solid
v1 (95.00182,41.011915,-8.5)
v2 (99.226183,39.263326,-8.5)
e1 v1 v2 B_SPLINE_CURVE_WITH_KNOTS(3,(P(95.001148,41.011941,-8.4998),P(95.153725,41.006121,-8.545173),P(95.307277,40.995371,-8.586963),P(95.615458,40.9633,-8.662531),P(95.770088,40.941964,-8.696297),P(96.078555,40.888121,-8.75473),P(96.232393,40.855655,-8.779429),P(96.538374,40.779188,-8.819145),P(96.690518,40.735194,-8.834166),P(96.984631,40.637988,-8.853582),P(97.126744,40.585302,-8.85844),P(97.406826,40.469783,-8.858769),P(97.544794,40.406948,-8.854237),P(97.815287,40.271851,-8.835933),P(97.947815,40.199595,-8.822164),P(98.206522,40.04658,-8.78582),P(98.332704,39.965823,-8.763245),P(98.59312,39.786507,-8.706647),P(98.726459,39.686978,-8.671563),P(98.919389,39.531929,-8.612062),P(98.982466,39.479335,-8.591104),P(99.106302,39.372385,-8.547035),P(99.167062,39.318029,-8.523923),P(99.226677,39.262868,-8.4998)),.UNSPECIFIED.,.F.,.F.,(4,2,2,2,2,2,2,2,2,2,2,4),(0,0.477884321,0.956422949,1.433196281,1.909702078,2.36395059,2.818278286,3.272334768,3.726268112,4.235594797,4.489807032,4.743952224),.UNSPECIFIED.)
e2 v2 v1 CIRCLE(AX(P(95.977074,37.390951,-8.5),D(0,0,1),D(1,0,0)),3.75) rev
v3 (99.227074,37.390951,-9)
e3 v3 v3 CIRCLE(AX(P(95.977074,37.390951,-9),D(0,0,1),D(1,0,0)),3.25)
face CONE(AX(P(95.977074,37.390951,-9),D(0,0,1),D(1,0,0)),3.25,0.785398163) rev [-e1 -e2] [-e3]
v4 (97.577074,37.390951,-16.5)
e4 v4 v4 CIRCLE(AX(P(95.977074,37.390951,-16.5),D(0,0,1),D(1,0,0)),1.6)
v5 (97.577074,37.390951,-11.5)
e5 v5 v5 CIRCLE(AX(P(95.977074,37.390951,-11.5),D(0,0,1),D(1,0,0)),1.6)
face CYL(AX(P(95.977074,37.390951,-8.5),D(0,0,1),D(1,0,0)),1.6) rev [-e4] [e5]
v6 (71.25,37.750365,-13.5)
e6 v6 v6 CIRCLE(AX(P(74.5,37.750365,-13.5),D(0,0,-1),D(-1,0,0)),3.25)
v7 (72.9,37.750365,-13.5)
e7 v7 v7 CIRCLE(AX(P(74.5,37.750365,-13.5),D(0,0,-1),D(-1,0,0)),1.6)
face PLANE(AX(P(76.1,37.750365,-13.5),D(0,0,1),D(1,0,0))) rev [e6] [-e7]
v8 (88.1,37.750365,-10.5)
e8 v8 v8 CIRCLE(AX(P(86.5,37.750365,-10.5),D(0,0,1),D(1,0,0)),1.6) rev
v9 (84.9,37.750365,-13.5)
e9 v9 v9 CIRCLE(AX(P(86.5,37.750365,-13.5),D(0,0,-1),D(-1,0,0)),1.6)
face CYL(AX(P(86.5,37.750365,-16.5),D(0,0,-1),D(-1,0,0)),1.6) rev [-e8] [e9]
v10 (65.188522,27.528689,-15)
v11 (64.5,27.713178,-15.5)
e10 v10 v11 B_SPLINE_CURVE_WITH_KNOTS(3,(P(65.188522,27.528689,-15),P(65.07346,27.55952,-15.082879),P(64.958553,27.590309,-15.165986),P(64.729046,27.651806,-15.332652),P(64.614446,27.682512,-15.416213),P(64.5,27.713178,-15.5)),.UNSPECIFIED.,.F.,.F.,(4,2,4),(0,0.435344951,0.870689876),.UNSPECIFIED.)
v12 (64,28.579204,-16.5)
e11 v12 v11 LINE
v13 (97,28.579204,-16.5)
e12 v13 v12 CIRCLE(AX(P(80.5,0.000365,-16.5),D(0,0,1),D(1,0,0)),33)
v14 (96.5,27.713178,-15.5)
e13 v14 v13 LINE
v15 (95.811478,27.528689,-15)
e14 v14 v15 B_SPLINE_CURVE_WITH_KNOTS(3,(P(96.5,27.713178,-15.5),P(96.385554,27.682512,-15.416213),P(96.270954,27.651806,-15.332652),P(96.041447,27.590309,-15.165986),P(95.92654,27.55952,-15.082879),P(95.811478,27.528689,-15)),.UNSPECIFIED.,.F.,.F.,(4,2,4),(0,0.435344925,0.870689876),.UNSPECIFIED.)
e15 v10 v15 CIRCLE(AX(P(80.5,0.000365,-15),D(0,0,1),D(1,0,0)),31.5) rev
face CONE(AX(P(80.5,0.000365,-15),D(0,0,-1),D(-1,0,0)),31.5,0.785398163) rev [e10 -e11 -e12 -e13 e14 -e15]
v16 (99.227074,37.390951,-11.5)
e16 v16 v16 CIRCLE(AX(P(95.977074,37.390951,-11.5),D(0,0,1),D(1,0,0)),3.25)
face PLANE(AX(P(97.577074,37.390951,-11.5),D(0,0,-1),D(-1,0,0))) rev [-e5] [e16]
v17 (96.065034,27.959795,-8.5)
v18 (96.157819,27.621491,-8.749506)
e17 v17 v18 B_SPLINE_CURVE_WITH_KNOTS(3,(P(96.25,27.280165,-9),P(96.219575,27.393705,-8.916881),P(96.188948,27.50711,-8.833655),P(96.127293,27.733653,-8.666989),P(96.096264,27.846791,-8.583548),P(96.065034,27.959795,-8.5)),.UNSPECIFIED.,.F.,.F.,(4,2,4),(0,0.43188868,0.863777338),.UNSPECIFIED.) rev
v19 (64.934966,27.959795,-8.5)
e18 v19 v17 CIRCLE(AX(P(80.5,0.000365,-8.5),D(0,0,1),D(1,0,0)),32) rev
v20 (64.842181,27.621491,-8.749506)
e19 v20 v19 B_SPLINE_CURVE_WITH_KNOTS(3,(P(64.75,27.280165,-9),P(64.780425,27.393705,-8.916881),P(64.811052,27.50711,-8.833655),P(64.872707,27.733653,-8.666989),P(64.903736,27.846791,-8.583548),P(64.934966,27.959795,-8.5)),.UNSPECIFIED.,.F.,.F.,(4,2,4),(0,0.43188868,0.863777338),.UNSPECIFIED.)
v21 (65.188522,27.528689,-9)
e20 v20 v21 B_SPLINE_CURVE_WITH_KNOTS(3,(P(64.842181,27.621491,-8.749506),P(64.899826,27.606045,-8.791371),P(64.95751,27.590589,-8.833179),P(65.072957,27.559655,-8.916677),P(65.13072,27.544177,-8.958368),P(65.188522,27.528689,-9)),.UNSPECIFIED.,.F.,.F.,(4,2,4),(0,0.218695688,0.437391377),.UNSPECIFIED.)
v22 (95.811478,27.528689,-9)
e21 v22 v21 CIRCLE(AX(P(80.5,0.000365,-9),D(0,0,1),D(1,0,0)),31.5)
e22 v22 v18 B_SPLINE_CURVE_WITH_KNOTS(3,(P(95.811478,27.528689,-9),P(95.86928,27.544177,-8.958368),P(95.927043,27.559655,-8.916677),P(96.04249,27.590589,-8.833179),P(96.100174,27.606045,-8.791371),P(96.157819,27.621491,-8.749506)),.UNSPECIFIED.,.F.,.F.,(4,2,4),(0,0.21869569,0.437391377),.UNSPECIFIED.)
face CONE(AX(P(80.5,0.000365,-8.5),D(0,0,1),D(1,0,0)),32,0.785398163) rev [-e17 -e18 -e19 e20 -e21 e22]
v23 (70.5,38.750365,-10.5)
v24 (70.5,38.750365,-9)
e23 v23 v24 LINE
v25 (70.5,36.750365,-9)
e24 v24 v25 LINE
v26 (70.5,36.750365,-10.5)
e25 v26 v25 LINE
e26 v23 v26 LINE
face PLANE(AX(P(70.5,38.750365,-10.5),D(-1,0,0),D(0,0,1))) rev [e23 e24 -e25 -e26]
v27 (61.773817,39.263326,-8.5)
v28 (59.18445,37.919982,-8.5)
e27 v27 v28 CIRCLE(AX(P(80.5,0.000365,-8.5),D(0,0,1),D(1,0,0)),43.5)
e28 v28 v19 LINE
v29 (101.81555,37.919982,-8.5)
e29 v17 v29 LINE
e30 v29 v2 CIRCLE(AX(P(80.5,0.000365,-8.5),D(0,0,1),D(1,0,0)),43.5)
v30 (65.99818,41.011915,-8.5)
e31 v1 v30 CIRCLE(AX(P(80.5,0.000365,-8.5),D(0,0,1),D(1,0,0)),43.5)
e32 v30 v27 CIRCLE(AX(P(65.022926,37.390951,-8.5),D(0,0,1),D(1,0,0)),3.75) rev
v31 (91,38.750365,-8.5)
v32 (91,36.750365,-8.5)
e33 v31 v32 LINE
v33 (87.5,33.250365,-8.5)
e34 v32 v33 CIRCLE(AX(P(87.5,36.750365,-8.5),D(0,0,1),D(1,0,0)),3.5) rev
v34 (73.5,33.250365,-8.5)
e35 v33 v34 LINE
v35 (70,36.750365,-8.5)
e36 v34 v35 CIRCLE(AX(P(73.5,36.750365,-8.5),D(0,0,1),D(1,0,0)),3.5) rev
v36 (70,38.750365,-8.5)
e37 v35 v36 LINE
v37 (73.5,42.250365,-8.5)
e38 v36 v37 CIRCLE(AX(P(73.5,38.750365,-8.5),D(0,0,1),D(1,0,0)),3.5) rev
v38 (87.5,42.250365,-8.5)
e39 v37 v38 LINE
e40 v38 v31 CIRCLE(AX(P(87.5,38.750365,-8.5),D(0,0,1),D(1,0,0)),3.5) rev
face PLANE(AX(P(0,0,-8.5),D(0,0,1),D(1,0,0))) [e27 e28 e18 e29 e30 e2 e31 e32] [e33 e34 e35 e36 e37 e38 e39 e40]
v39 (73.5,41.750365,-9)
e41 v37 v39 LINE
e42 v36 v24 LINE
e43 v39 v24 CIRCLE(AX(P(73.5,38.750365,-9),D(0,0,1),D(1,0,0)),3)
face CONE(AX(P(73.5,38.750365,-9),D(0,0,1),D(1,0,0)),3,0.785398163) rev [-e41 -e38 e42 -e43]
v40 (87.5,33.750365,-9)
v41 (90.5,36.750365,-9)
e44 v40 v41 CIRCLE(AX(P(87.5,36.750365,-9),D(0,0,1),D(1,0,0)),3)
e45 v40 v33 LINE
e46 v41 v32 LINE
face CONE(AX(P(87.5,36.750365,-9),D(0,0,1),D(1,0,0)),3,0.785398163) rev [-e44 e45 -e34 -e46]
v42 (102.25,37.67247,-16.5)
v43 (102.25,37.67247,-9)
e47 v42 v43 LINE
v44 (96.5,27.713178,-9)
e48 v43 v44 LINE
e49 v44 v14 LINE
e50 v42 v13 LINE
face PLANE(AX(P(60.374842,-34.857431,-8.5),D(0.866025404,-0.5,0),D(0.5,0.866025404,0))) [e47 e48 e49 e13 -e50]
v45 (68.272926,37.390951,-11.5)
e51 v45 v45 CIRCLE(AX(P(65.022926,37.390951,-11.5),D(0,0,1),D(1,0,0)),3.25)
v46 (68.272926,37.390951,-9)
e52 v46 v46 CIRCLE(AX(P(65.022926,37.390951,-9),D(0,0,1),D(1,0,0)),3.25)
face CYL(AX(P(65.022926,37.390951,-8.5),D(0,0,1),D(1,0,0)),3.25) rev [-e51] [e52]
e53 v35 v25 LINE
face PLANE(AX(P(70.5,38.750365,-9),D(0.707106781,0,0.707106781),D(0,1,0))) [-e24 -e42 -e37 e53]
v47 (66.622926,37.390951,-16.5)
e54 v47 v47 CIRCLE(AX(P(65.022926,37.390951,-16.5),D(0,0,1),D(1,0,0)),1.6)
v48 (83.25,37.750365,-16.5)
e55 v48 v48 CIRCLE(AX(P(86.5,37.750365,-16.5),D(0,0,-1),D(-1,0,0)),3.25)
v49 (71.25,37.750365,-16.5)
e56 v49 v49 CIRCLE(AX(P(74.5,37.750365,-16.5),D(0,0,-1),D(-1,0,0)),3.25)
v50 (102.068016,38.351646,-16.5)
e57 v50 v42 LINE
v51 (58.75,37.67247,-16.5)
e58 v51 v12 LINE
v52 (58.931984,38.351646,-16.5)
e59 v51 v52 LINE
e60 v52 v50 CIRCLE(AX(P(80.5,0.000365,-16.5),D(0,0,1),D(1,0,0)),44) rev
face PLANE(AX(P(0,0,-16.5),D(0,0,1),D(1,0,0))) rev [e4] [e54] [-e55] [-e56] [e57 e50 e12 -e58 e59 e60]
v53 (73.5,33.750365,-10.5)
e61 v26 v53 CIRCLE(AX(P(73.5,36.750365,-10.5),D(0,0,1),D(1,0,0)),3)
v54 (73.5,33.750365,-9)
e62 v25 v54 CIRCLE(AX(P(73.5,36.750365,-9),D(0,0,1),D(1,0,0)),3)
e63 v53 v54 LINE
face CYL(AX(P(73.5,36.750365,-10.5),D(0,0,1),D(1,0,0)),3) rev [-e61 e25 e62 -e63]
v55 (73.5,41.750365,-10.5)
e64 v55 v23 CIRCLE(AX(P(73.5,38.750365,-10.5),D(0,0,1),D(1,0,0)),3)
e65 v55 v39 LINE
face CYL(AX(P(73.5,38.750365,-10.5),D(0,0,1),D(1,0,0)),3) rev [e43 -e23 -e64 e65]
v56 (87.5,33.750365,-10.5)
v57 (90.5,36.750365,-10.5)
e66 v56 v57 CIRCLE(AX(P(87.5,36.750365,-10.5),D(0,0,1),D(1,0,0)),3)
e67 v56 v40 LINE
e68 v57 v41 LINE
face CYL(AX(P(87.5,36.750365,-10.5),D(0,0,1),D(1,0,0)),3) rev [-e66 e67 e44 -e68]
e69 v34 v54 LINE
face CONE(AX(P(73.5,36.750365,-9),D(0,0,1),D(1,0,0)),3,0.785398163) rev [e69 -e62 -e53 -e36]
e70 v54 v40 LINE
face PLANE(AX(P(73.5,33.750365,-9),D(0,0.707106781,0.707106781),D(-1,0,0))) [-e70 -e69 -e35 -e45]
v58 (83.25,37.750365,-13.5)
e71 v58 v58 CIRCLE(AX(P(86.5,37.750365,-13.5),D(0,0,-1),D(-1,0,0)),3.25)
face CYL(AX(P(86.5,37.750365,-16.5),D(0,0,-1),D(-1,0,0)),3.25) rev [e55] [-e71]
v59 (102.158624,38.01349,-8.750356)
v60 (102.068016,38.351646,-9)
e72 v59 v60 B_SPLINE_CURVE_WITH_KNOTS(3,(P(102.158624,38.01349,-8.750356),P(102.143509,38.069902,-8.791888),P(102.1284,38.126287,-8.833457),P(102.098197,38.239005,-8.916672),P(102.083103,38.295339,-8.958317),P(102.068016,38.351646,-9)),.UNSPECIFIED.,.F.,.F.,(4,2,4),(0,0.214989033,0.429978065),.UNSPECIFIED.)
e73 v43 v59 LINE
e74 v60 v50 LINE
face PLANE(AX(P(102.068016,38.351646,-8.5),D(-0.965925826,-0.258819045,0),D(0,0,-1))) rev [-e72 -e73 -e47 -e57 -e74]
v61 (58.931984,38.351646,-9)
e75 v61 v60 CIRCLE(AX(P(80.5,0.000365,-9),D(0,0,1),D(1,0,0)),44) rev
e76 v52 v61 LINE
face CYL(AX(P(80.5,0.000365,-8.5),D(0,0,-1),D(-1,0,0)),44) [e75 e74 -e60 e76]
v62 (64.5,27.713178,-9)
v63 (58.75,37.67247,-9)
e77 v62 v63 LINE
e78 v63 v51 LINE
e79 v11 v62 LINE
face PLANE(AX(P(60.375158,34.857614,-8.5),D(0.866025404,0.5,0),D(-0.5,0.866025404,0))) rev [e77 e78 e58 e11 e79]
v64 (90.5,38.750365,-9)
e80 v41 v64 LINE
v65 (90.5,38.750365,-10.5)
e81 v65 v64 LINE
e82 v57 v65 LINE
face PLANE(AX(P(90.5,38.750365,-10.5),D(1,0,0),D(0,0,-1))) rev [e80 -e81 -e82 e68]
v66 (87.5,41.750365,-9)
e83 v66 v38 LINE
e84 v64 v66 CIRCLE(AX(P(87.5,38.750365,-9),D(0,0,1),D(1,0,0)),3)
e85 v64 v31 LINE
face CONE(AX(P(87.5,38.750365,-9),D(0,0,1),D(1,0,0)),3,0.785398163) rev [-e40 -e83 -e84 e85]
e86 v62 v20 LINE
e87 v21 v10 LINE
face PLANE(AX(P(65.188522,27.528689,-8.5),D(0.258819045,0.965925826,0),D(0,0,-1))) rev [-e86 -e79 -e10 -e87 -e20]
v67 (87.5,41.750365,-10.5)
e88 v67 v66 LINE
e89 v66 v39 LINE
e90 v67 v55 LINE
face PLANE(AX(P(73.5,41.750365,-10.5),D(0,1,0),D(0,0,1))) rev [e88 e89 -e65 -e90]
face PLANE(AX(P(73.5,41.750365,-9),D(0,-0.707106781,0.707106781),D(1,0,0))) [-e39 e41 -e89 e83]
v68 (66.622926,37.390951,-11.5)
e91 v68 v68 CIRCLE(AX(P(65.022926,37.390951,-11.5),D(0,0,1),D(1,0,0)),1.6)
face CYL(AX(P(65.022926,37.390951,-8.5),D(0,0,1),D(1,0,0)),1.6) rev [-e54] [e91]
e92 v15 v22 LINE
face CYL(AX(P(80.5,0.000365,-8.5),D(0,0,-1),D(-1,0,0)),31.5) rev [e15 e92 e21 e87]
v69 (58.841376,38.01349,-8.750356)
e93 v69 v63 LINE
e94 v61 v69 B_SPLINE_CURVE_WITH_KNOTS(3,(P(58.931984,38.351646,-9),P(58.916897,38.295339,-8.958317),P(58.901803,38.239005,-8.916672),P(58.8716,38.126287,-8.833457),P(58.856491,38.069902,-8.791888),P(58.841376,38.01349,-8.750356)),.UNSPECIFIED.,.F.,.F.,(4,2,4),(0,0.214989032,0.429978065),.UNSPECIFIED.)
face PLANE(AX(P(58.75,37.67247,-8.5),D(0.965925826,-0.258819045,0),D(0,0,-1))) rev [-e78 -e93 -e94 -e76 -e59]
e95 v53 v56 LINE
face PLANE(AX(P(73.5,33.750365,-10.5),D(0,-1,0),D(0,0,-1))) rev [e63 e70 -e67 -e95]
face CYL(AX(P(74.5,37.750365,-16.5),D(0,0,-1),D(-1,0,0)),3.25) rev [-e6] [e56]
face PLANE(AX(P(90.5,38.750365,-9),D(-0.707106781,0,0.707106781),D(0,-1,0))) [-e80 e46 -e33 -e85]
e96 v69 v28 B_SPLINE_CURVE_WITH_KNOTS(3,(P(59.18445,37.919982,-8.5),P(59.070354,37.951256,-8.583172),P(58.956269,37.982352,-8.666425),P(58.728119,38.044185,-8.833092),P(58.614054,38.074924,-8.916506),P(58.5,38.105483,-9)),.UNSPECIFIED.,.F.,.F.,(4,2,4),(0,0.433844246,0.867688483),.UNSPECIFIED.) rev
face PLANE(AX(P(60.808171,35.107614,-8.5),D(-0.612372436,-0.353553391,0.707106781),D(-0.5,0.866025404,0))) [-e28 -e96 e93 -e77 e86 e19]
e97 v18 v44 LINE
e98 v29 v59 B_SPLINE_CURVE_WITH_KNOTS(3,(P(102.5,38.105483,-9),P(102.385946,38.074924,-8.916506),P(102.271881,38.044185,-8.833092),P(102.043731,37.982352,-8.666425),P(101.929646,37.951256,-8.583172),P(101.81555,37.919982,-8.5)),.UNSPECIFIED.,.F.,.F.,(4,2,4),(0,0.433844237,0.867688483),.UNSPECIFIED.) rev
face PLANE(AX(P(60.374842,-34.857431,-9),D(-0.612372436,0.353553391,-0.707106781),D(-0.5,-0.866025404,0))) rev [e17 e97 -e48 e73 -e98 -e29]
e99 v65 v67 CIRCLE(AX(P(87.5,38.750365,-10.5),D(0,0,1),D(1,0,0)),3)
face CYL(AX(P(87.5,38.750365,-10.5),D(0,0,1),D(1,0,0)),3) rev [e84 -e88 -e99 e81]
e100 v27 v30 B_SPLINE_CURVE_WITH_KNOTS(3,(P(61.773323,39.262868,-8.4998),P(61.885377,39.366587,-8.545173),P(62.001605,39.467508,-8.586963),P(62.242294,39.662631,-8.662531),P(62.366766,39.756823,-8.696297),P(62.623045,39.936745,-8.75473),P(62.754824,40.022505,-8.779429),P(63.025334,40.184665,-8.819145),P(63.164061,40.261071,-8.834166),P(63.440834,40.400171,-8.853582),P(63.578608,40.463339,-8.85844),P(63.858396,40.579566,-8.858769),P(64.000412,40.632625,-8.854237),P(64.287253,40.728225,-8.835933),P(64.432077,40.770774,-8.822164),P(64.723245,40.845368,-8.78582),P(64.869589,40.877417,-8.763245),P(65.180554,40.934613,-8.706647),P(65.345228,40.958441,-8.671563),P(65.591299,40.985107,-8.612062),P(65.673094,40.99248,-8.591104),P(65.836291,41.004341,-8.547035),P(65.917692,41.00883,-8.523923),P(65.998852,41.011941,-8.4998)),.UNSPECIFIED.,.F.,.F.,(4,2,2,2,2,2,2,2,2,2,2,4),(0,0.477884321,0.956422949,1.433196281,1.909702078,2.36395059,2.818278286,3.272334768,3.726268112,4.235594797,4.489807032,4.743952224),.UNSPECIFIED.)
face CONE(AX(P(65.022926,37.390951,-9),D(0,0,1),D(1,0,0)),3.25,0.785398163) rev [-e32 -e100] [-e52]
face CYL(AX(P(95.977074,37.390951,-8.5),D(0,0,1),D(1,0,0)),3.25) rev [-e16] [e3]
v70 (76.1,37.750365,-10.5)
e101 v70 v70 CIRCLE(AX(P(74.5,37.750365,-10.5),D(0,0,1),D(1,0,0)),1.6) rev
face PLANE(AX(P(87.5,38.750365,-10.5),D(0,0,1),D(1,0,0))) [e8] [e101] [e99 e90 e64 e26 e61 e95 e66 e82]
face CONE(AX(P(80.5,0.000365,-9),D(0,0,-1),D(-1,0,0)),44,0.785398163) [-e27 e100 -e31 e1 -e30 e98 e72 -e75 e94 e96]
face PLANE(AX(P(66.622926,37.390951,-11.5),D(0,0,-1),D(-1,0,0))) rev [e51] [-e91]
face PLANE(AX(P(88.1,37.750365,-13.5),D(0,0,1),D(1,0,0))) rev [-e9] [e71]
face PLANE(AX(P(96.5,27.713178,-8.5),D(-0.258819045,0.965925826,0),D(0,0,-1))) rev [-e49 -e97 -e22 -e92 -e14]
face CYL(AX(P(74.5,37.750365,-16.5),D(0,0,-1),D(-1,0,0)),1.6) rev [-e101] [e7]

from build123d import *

# Parameters (mm, degrees)
EXTRUDE_1_DEPTH              = 8
CHAMFER_7_SIZE               = 1.5
HOLE_WIZARD_M3_1_D           = 3.2
HOLE_WIZARD_M3_1_CBORE_D     = 6.5
HOLE_WIZARD_M3_1_CBORE_DEPTH = 3
HOLE_WIZARD_M3_2_D           = 3.2
HOLE_WIZARD_M3_2_CBORE_D     = 6.5
HOLE_WIZARD_M3_2_CBORE_DEPTH = 3
CUT_EXTRUDE_6_DEPTH          = 2
CHAMFER_8_SIZE               = 0.5
CHAMFER_9_SIZE               = 0.5


with BuildPart() as part:
    # ｽｹｯﾁ3 → ﾎﾞｽ - 押し出し1 (new body)
    with BuildSketch(Plane.XY.offset(-16.5)):
        with BuildLine():
            Line((58.49999999, 38.105482977), (64.74999999, 27.280165429))
            ThreePointArc((64.74999999, 27.280165429), (80.49999999, 31.50036521), (96.24999999, 27.280165429))
            Line((96.24999999, 27.280165429), (102.49999999, 38.105482977))
            ThreePointArc((102.49999999, 38.105482977), (80.49999999, 44.00036521), (58.49999999, 38.105482977))
        make_face()
    extrude(amount=EXTRUDE_1_DEPTH)

    # 面取り7
    chamfer_7_edges = [part.edges().sort_by_distance(p)[0] for p in [
        (80.49999999, 31.50036521, -16.5),
    ]]
    chamfer(chamfer_7_edges, length=CHAMFER_7_SIZE)

    # M3 穴付きねじ用座ぐり穴1 (through all)
    with Locations(Plane.XY.offset(-8.5)):
        with Locations((65.0229264, 37.390950693), (95.977073581, 37.390950693)):
            CounterBoreHole(HOLE_WIZARD_M3_1_D / 2, HOLE_WIZARD_M3_1_CBORE_D / 2, HOLE_WIZARD_M3_1_CBORE_DEPTH)

    # M3 穴付きねじ用座ぐり穴2 (through all)
    with Locations(Plane(origin=(0, 0, -16.5), x_dir=(-1, 0, 0), z_dir=(0, 0, -1))):
        with Locations((-86.49999999, 37.75036521), (-74.49999999, 37.75036521)):
            CounterBoreHole(HOLE_WIZARD_M3_2_D / 2, HOLE_WIZARD_M3_2_CBORE_D / 2, HOLE_WIZARD_M3_2_CBORE_DEPTH)

    # ｽｹｯﾁ17 → ｶｯﾄ - 押し出し6 (cut)
    with BuildSketch(Plane.XY.offset(-8.5)):
        with BuildLine():
            Line((73.49999999, 41.75036521), (87.49999999, 41.75036521))
            ThreePointArc((87.49999999, 41.75036521), (89.621320334, 40.871685554), (90.49999999, 38.75036521))
            Line((90.49999999, 38.75036521), (90.49999999, 36.75036521))
            ThreePointArc((90.49999999, 36.75036521), (89.621320334, 34.629044867), (87.49999999, 33.75036521))
            Line((87.49999999, 33.75036521), (73.49999999, 33.75036521))
            ThreePointArc((73.49999999, 33.75036521), (71.378679647, 34.629044867), (70.49999999, 36.75036521))
            Line((70.49999999, 36.75036521), (70.49999999, 38.75036521))
            ThreePointArc((70.49999999, 38.75036521), (71.378679647, 40.871685554), (73.49999999, 41.75036521))
        make_face()
    extrude(amount=-CUT_EXTRUDE_6_DEPTH, mode=Mode.SUBTRACT)

    # 面取り8
    # the kernel refuses this chamfer: 0.5 mm, written as the material it takes off along each edge
    with BuildSketch(Plane(origin=(80.49999999, 0.00036521, -8.5), x_dir=(-0.5349312949950591, 0.844895561377209, 0), z_dir=(-0.844895561377209, -0.5349312949950591, 0))) as chamfer_8_piece_1:
        Polygon((31.5, CHAMFER_8_SIZE), (31.5 + CHAMFER_8_SIZE, 0), (31.5, 0), align=None)
    revolve(axis=Axis((80.49999999, 0.00036521, -8.5), (0, 0, -1)), revolution_arc=64.678504259, mode=Mode.SUBTRACT)
    with BuildSketch(Plane(origin=(95.607079243, 26.16659403, -8.5), x_dir=(-0.8660254037844379, 0.5000000000000012, 0), z_dir=(0.5000000000000012, 0.866025403784438, 0))) as chamfer_8_piece_2:
        Polygon((CHAMFER_8_SIZE, 0), (0, -CHAMFER_8_SIZE), (0, 0), align=None)
    extrude(amount=15.071682988, mode=Mode.SUBTRACT)
    with BuildSketch(Plane(origin=(80.49999999, 0.00036521, -8.5), x_dir=(0.5250957878127545, 0.8510431326444641, 0), z_dir=(0.8510431326444641, -0.5250957878127545, 0))) as chamfer_8_piece_3:
        Polygon((44 - CHAMFER_8_SIZE, 0), (44, -CHAMFER_8_SIZE), (44, 0), align=None)
    revolve(axis=Axis((80.49999999, 0.00036521, -8.5), (0, 0, 1)), revolution_arc=63.349383731, mode=Mode.SUBTRACT)
    with BuildSketch(Plane(origin=(95.977073581, 37.390950693, -8.5), x_dir=(1, 0, 0), z_dir=(0, -1, 0))) as chamfer_8_piece_4:
        Polygon((3.25 + CHAMFER_8_SIZE, 0), (3.25, -CHAMFER_8_SIZE), (3.25, 0), align=None)
    revolve(axis=Axis((95.977073581, 37.390950693, -8.5), (0, 0, 1)), mode=Mode.SUBTRACT)
    with BuildSketch(Plane(origin=(65.0229264, 37.390950693, -8.5), x_dir=(1, 0, 0), z_dir=(0, -1, 0))) as chamfer_8_piece_5:
        Polygon((3.25 + CHAMFER_8_SIZE, 0), (3.25, -CHAMFER_8_SIZE), (3.25, 0), align=None)
    revolve(axis=Axis((65.0229264, 37.390950693, -8.5), (0, 0, 1)), mode=Mode.SUBTRACT)
    with BuildSketch(Plane(origin=(57.857079243, 39.219054376, -8.5), x_dir=(0, 0, -1), z_dir=(0.5000000000000007, -0.8660254037844384, 0))) as chamfer_8_piece_6:
        Polygon((CHAMFER_8_SIZE, 0), (0, CHAMFER_8_SIZE), (0, 0), align=None)
    extrude(amount=15.071682988, mode=Mode.SUBTRACT)
    with BuildSketch(Plane(origin=(87.49999999, 38.75036521, -8.5), x_dir=(0, 1, 0), z_dir=(-1, 0, 0))) as chamfer_8_piece_7:
        Polygon((3 + CHAMFER_8_SIZE, 0), (3, CHAMFER_8_SIZE), (3, 0), align=None)
    revolve(axis=Axis((87.49999999, 38.75036521, -8.5), (0, 0, -1)), revolution_arc=90, mode=Mode.SUBTRACT)
    with BuildSketch(Plane(origin=(73.49999999, 41.75036521, -8.5), x_dir=(0, 1, 0), z_dir=(1, 0, 0)), Plane(origin=(87.49999999, 33.75036521, -8.5), x_dir=(0, -1, 0), z_dir=(-1, 0, 0))) as chamfer_8_piece_8:
        Polygon((CHAMFER_8_SIZE, 0), (0, -CHAMFER_8_SIZE), (0, 0), align=None)
    extrude(amount=14, mode=Mode.SUBTRACT)
    with BuildSketch(Plane(origin=(73.49999999, 38.75036521, -8.5), x_dir=(-1, 0, 0), z_dir=(0, -1, 0))) as chamfer_8_piece_9:
        Polygon((3 + CHAMFER_8_SIZE, 0), (3, CHAMFER_8_SIZE), (3, 0), align=None)
    revolve(axis=Axis((73.49999999, 38.75036521, -8.5), (0, 0, -1)), revolution_arc=90, mode=Mode.SUBTRACT)
    with BuildSketch(Plane(origin=(70.49999999, 36.75036521, -8.5), x_dir=(-1, 0, 0), z_dir=(0, 1, 0)), Plane(origin=(90.49999999, 38.75036521, -8.5), x_dir=(1, 0, 0), z_dir=(0, -1, 0))) as chamfer_8_piece_10:
        Polygon((CHAMFER_8_SIZE, 0), (0, -CHAMFER_8_SIZE), (0, 0), align=None)
    extrude(amount=2, mode=Mode.SUBTRACT)
    with BuildSketch(Plane(origin=(73.49999999, 36.75036521, -8.5), x_dir=(0, -1, 0), z_dir=(1, 0, 0))) as chamfer_8_piece_11:
        Polygon((3 + CHAMFER_8_SIZE, 0), (3, CHAMFER_8_SIZE), (3, 0), align=None)
    revolve(axis=Axis((73.49999999, 36.75036521, -8.5), (0, 0, -1)), revolution_arc=90, mode=Mode.SUBTRACT)
    with BuildSketch(Plane(origin=(87.49999999, 36.75036521, -8.5), x_dir=(1, 0, 0), z_dir=(0, 1, 0))) as chamfer_8_piece_12:
        Polygon((3 + CHAMFER_8_SIZE, 0), (3, CHAMFER_8_SIZE), (3, 0), align=None)
    revolve(axis=Axis((87.49999999, 36.75036521, -8.5), (0, 0, -1)), revolution_arc=90, mode=Mode.SUBTRACT)

    # 面取り9
    # the kernel refuses this chamfer: 0.5 mm, written as the material it takes off along each edge
    with BuildSketch(Plane(origin=(96.24999999, 27.280165429, -16.296233904), x_dir=(-0.8699980733677616, 0.4930551209919465, 0), z_dir=(0, 0, 1))) as chamfer_9_piece_1:
        with BuildLine():
            Line((0.504048916, 0), (-CHAMFER_9_SIZE * 0.00800077643885, -CHAMFER_9_SIZE * 0.999967993276))
            Line((-CHAMFER_9_SIZE * 0.00800077643885, -CHAMFER_9_SIZE * 0.999967993276), (0, 0))
            ThreePointArc((0, 0), (0.259153689, -0.001007405), (0.504048916, 0))
        make_face()
    extrude(amount=8.592467809, mode=Mode.SUBTRACT)
    with BuildSketch(Plane(origin=(64.74999999, 27.280165429, -16.296233904), x_dir=(-0.499999999999999, 0.8660254037844393, 0), z_dir=(0, 0, 1))) as chamfer_9_piece_2:
        with BuildLine():
            Line((CHAMFER_9_SIZE, 0), (-0.004032783, -0.504032783))
            ThreePointArc((-0.004032783, -0.504032783), (-0.001066058, -0.259153454), (0, 0))
            Line((0, 0), (CHAMFER_9_SIZE, 0))
        make_face()
    extrude(amount=8.592467809, mode=Mode.SUBTRACT)
    with BuildSketch(Plane(origin=(58.49999999, 38.105482977, -17.785841494), x_dir=(0.5000000000000021, -0.8660254037844375, 0), z_dir=(0, 0, 1))) as chamfer_9_piece_3:
        with BuildLine():
            Line((CHAMFER_9_SIZE, 0), (0.002809166, 0.497190834))
            ThreePointArc((0.002809166, 0.497190834), (0.000742578, 0.255629249), (0, 0))
            Line((0, 0), (CHAMFER_9_SIZE, 0))
        make_face()
    extrude(amount=10.071682988, mode=Mode.SUBTRACT)
    with BuildSketch(Plane(origin=(102.49999999, 38.105482977, -17.785841494), x_dir=(-0.8688365739050292, 0.4950989879256175, 0), z_dir=(0, 0, 1))) as chamfer_9_piece_4:
        with BuildLine():
            Line((0.49719877, 0), (CHAMFER_9_SIZE * 0.00564998602096, CHAMFER_9_SIZE * 0.999984038702))
            Line((CHAMFER_9_SIZE * 0.00564998602096, CHAMFER_9_SIZE * 0.999984038702), (0, 0))
            ThreePointArc((0, 0), (0.255629364, -0.000701736), (0.49719877, 0))
        make_face()
    extrude(amount=10.071682988, mode=Mode.SUBTRACT)


solid = part.part
